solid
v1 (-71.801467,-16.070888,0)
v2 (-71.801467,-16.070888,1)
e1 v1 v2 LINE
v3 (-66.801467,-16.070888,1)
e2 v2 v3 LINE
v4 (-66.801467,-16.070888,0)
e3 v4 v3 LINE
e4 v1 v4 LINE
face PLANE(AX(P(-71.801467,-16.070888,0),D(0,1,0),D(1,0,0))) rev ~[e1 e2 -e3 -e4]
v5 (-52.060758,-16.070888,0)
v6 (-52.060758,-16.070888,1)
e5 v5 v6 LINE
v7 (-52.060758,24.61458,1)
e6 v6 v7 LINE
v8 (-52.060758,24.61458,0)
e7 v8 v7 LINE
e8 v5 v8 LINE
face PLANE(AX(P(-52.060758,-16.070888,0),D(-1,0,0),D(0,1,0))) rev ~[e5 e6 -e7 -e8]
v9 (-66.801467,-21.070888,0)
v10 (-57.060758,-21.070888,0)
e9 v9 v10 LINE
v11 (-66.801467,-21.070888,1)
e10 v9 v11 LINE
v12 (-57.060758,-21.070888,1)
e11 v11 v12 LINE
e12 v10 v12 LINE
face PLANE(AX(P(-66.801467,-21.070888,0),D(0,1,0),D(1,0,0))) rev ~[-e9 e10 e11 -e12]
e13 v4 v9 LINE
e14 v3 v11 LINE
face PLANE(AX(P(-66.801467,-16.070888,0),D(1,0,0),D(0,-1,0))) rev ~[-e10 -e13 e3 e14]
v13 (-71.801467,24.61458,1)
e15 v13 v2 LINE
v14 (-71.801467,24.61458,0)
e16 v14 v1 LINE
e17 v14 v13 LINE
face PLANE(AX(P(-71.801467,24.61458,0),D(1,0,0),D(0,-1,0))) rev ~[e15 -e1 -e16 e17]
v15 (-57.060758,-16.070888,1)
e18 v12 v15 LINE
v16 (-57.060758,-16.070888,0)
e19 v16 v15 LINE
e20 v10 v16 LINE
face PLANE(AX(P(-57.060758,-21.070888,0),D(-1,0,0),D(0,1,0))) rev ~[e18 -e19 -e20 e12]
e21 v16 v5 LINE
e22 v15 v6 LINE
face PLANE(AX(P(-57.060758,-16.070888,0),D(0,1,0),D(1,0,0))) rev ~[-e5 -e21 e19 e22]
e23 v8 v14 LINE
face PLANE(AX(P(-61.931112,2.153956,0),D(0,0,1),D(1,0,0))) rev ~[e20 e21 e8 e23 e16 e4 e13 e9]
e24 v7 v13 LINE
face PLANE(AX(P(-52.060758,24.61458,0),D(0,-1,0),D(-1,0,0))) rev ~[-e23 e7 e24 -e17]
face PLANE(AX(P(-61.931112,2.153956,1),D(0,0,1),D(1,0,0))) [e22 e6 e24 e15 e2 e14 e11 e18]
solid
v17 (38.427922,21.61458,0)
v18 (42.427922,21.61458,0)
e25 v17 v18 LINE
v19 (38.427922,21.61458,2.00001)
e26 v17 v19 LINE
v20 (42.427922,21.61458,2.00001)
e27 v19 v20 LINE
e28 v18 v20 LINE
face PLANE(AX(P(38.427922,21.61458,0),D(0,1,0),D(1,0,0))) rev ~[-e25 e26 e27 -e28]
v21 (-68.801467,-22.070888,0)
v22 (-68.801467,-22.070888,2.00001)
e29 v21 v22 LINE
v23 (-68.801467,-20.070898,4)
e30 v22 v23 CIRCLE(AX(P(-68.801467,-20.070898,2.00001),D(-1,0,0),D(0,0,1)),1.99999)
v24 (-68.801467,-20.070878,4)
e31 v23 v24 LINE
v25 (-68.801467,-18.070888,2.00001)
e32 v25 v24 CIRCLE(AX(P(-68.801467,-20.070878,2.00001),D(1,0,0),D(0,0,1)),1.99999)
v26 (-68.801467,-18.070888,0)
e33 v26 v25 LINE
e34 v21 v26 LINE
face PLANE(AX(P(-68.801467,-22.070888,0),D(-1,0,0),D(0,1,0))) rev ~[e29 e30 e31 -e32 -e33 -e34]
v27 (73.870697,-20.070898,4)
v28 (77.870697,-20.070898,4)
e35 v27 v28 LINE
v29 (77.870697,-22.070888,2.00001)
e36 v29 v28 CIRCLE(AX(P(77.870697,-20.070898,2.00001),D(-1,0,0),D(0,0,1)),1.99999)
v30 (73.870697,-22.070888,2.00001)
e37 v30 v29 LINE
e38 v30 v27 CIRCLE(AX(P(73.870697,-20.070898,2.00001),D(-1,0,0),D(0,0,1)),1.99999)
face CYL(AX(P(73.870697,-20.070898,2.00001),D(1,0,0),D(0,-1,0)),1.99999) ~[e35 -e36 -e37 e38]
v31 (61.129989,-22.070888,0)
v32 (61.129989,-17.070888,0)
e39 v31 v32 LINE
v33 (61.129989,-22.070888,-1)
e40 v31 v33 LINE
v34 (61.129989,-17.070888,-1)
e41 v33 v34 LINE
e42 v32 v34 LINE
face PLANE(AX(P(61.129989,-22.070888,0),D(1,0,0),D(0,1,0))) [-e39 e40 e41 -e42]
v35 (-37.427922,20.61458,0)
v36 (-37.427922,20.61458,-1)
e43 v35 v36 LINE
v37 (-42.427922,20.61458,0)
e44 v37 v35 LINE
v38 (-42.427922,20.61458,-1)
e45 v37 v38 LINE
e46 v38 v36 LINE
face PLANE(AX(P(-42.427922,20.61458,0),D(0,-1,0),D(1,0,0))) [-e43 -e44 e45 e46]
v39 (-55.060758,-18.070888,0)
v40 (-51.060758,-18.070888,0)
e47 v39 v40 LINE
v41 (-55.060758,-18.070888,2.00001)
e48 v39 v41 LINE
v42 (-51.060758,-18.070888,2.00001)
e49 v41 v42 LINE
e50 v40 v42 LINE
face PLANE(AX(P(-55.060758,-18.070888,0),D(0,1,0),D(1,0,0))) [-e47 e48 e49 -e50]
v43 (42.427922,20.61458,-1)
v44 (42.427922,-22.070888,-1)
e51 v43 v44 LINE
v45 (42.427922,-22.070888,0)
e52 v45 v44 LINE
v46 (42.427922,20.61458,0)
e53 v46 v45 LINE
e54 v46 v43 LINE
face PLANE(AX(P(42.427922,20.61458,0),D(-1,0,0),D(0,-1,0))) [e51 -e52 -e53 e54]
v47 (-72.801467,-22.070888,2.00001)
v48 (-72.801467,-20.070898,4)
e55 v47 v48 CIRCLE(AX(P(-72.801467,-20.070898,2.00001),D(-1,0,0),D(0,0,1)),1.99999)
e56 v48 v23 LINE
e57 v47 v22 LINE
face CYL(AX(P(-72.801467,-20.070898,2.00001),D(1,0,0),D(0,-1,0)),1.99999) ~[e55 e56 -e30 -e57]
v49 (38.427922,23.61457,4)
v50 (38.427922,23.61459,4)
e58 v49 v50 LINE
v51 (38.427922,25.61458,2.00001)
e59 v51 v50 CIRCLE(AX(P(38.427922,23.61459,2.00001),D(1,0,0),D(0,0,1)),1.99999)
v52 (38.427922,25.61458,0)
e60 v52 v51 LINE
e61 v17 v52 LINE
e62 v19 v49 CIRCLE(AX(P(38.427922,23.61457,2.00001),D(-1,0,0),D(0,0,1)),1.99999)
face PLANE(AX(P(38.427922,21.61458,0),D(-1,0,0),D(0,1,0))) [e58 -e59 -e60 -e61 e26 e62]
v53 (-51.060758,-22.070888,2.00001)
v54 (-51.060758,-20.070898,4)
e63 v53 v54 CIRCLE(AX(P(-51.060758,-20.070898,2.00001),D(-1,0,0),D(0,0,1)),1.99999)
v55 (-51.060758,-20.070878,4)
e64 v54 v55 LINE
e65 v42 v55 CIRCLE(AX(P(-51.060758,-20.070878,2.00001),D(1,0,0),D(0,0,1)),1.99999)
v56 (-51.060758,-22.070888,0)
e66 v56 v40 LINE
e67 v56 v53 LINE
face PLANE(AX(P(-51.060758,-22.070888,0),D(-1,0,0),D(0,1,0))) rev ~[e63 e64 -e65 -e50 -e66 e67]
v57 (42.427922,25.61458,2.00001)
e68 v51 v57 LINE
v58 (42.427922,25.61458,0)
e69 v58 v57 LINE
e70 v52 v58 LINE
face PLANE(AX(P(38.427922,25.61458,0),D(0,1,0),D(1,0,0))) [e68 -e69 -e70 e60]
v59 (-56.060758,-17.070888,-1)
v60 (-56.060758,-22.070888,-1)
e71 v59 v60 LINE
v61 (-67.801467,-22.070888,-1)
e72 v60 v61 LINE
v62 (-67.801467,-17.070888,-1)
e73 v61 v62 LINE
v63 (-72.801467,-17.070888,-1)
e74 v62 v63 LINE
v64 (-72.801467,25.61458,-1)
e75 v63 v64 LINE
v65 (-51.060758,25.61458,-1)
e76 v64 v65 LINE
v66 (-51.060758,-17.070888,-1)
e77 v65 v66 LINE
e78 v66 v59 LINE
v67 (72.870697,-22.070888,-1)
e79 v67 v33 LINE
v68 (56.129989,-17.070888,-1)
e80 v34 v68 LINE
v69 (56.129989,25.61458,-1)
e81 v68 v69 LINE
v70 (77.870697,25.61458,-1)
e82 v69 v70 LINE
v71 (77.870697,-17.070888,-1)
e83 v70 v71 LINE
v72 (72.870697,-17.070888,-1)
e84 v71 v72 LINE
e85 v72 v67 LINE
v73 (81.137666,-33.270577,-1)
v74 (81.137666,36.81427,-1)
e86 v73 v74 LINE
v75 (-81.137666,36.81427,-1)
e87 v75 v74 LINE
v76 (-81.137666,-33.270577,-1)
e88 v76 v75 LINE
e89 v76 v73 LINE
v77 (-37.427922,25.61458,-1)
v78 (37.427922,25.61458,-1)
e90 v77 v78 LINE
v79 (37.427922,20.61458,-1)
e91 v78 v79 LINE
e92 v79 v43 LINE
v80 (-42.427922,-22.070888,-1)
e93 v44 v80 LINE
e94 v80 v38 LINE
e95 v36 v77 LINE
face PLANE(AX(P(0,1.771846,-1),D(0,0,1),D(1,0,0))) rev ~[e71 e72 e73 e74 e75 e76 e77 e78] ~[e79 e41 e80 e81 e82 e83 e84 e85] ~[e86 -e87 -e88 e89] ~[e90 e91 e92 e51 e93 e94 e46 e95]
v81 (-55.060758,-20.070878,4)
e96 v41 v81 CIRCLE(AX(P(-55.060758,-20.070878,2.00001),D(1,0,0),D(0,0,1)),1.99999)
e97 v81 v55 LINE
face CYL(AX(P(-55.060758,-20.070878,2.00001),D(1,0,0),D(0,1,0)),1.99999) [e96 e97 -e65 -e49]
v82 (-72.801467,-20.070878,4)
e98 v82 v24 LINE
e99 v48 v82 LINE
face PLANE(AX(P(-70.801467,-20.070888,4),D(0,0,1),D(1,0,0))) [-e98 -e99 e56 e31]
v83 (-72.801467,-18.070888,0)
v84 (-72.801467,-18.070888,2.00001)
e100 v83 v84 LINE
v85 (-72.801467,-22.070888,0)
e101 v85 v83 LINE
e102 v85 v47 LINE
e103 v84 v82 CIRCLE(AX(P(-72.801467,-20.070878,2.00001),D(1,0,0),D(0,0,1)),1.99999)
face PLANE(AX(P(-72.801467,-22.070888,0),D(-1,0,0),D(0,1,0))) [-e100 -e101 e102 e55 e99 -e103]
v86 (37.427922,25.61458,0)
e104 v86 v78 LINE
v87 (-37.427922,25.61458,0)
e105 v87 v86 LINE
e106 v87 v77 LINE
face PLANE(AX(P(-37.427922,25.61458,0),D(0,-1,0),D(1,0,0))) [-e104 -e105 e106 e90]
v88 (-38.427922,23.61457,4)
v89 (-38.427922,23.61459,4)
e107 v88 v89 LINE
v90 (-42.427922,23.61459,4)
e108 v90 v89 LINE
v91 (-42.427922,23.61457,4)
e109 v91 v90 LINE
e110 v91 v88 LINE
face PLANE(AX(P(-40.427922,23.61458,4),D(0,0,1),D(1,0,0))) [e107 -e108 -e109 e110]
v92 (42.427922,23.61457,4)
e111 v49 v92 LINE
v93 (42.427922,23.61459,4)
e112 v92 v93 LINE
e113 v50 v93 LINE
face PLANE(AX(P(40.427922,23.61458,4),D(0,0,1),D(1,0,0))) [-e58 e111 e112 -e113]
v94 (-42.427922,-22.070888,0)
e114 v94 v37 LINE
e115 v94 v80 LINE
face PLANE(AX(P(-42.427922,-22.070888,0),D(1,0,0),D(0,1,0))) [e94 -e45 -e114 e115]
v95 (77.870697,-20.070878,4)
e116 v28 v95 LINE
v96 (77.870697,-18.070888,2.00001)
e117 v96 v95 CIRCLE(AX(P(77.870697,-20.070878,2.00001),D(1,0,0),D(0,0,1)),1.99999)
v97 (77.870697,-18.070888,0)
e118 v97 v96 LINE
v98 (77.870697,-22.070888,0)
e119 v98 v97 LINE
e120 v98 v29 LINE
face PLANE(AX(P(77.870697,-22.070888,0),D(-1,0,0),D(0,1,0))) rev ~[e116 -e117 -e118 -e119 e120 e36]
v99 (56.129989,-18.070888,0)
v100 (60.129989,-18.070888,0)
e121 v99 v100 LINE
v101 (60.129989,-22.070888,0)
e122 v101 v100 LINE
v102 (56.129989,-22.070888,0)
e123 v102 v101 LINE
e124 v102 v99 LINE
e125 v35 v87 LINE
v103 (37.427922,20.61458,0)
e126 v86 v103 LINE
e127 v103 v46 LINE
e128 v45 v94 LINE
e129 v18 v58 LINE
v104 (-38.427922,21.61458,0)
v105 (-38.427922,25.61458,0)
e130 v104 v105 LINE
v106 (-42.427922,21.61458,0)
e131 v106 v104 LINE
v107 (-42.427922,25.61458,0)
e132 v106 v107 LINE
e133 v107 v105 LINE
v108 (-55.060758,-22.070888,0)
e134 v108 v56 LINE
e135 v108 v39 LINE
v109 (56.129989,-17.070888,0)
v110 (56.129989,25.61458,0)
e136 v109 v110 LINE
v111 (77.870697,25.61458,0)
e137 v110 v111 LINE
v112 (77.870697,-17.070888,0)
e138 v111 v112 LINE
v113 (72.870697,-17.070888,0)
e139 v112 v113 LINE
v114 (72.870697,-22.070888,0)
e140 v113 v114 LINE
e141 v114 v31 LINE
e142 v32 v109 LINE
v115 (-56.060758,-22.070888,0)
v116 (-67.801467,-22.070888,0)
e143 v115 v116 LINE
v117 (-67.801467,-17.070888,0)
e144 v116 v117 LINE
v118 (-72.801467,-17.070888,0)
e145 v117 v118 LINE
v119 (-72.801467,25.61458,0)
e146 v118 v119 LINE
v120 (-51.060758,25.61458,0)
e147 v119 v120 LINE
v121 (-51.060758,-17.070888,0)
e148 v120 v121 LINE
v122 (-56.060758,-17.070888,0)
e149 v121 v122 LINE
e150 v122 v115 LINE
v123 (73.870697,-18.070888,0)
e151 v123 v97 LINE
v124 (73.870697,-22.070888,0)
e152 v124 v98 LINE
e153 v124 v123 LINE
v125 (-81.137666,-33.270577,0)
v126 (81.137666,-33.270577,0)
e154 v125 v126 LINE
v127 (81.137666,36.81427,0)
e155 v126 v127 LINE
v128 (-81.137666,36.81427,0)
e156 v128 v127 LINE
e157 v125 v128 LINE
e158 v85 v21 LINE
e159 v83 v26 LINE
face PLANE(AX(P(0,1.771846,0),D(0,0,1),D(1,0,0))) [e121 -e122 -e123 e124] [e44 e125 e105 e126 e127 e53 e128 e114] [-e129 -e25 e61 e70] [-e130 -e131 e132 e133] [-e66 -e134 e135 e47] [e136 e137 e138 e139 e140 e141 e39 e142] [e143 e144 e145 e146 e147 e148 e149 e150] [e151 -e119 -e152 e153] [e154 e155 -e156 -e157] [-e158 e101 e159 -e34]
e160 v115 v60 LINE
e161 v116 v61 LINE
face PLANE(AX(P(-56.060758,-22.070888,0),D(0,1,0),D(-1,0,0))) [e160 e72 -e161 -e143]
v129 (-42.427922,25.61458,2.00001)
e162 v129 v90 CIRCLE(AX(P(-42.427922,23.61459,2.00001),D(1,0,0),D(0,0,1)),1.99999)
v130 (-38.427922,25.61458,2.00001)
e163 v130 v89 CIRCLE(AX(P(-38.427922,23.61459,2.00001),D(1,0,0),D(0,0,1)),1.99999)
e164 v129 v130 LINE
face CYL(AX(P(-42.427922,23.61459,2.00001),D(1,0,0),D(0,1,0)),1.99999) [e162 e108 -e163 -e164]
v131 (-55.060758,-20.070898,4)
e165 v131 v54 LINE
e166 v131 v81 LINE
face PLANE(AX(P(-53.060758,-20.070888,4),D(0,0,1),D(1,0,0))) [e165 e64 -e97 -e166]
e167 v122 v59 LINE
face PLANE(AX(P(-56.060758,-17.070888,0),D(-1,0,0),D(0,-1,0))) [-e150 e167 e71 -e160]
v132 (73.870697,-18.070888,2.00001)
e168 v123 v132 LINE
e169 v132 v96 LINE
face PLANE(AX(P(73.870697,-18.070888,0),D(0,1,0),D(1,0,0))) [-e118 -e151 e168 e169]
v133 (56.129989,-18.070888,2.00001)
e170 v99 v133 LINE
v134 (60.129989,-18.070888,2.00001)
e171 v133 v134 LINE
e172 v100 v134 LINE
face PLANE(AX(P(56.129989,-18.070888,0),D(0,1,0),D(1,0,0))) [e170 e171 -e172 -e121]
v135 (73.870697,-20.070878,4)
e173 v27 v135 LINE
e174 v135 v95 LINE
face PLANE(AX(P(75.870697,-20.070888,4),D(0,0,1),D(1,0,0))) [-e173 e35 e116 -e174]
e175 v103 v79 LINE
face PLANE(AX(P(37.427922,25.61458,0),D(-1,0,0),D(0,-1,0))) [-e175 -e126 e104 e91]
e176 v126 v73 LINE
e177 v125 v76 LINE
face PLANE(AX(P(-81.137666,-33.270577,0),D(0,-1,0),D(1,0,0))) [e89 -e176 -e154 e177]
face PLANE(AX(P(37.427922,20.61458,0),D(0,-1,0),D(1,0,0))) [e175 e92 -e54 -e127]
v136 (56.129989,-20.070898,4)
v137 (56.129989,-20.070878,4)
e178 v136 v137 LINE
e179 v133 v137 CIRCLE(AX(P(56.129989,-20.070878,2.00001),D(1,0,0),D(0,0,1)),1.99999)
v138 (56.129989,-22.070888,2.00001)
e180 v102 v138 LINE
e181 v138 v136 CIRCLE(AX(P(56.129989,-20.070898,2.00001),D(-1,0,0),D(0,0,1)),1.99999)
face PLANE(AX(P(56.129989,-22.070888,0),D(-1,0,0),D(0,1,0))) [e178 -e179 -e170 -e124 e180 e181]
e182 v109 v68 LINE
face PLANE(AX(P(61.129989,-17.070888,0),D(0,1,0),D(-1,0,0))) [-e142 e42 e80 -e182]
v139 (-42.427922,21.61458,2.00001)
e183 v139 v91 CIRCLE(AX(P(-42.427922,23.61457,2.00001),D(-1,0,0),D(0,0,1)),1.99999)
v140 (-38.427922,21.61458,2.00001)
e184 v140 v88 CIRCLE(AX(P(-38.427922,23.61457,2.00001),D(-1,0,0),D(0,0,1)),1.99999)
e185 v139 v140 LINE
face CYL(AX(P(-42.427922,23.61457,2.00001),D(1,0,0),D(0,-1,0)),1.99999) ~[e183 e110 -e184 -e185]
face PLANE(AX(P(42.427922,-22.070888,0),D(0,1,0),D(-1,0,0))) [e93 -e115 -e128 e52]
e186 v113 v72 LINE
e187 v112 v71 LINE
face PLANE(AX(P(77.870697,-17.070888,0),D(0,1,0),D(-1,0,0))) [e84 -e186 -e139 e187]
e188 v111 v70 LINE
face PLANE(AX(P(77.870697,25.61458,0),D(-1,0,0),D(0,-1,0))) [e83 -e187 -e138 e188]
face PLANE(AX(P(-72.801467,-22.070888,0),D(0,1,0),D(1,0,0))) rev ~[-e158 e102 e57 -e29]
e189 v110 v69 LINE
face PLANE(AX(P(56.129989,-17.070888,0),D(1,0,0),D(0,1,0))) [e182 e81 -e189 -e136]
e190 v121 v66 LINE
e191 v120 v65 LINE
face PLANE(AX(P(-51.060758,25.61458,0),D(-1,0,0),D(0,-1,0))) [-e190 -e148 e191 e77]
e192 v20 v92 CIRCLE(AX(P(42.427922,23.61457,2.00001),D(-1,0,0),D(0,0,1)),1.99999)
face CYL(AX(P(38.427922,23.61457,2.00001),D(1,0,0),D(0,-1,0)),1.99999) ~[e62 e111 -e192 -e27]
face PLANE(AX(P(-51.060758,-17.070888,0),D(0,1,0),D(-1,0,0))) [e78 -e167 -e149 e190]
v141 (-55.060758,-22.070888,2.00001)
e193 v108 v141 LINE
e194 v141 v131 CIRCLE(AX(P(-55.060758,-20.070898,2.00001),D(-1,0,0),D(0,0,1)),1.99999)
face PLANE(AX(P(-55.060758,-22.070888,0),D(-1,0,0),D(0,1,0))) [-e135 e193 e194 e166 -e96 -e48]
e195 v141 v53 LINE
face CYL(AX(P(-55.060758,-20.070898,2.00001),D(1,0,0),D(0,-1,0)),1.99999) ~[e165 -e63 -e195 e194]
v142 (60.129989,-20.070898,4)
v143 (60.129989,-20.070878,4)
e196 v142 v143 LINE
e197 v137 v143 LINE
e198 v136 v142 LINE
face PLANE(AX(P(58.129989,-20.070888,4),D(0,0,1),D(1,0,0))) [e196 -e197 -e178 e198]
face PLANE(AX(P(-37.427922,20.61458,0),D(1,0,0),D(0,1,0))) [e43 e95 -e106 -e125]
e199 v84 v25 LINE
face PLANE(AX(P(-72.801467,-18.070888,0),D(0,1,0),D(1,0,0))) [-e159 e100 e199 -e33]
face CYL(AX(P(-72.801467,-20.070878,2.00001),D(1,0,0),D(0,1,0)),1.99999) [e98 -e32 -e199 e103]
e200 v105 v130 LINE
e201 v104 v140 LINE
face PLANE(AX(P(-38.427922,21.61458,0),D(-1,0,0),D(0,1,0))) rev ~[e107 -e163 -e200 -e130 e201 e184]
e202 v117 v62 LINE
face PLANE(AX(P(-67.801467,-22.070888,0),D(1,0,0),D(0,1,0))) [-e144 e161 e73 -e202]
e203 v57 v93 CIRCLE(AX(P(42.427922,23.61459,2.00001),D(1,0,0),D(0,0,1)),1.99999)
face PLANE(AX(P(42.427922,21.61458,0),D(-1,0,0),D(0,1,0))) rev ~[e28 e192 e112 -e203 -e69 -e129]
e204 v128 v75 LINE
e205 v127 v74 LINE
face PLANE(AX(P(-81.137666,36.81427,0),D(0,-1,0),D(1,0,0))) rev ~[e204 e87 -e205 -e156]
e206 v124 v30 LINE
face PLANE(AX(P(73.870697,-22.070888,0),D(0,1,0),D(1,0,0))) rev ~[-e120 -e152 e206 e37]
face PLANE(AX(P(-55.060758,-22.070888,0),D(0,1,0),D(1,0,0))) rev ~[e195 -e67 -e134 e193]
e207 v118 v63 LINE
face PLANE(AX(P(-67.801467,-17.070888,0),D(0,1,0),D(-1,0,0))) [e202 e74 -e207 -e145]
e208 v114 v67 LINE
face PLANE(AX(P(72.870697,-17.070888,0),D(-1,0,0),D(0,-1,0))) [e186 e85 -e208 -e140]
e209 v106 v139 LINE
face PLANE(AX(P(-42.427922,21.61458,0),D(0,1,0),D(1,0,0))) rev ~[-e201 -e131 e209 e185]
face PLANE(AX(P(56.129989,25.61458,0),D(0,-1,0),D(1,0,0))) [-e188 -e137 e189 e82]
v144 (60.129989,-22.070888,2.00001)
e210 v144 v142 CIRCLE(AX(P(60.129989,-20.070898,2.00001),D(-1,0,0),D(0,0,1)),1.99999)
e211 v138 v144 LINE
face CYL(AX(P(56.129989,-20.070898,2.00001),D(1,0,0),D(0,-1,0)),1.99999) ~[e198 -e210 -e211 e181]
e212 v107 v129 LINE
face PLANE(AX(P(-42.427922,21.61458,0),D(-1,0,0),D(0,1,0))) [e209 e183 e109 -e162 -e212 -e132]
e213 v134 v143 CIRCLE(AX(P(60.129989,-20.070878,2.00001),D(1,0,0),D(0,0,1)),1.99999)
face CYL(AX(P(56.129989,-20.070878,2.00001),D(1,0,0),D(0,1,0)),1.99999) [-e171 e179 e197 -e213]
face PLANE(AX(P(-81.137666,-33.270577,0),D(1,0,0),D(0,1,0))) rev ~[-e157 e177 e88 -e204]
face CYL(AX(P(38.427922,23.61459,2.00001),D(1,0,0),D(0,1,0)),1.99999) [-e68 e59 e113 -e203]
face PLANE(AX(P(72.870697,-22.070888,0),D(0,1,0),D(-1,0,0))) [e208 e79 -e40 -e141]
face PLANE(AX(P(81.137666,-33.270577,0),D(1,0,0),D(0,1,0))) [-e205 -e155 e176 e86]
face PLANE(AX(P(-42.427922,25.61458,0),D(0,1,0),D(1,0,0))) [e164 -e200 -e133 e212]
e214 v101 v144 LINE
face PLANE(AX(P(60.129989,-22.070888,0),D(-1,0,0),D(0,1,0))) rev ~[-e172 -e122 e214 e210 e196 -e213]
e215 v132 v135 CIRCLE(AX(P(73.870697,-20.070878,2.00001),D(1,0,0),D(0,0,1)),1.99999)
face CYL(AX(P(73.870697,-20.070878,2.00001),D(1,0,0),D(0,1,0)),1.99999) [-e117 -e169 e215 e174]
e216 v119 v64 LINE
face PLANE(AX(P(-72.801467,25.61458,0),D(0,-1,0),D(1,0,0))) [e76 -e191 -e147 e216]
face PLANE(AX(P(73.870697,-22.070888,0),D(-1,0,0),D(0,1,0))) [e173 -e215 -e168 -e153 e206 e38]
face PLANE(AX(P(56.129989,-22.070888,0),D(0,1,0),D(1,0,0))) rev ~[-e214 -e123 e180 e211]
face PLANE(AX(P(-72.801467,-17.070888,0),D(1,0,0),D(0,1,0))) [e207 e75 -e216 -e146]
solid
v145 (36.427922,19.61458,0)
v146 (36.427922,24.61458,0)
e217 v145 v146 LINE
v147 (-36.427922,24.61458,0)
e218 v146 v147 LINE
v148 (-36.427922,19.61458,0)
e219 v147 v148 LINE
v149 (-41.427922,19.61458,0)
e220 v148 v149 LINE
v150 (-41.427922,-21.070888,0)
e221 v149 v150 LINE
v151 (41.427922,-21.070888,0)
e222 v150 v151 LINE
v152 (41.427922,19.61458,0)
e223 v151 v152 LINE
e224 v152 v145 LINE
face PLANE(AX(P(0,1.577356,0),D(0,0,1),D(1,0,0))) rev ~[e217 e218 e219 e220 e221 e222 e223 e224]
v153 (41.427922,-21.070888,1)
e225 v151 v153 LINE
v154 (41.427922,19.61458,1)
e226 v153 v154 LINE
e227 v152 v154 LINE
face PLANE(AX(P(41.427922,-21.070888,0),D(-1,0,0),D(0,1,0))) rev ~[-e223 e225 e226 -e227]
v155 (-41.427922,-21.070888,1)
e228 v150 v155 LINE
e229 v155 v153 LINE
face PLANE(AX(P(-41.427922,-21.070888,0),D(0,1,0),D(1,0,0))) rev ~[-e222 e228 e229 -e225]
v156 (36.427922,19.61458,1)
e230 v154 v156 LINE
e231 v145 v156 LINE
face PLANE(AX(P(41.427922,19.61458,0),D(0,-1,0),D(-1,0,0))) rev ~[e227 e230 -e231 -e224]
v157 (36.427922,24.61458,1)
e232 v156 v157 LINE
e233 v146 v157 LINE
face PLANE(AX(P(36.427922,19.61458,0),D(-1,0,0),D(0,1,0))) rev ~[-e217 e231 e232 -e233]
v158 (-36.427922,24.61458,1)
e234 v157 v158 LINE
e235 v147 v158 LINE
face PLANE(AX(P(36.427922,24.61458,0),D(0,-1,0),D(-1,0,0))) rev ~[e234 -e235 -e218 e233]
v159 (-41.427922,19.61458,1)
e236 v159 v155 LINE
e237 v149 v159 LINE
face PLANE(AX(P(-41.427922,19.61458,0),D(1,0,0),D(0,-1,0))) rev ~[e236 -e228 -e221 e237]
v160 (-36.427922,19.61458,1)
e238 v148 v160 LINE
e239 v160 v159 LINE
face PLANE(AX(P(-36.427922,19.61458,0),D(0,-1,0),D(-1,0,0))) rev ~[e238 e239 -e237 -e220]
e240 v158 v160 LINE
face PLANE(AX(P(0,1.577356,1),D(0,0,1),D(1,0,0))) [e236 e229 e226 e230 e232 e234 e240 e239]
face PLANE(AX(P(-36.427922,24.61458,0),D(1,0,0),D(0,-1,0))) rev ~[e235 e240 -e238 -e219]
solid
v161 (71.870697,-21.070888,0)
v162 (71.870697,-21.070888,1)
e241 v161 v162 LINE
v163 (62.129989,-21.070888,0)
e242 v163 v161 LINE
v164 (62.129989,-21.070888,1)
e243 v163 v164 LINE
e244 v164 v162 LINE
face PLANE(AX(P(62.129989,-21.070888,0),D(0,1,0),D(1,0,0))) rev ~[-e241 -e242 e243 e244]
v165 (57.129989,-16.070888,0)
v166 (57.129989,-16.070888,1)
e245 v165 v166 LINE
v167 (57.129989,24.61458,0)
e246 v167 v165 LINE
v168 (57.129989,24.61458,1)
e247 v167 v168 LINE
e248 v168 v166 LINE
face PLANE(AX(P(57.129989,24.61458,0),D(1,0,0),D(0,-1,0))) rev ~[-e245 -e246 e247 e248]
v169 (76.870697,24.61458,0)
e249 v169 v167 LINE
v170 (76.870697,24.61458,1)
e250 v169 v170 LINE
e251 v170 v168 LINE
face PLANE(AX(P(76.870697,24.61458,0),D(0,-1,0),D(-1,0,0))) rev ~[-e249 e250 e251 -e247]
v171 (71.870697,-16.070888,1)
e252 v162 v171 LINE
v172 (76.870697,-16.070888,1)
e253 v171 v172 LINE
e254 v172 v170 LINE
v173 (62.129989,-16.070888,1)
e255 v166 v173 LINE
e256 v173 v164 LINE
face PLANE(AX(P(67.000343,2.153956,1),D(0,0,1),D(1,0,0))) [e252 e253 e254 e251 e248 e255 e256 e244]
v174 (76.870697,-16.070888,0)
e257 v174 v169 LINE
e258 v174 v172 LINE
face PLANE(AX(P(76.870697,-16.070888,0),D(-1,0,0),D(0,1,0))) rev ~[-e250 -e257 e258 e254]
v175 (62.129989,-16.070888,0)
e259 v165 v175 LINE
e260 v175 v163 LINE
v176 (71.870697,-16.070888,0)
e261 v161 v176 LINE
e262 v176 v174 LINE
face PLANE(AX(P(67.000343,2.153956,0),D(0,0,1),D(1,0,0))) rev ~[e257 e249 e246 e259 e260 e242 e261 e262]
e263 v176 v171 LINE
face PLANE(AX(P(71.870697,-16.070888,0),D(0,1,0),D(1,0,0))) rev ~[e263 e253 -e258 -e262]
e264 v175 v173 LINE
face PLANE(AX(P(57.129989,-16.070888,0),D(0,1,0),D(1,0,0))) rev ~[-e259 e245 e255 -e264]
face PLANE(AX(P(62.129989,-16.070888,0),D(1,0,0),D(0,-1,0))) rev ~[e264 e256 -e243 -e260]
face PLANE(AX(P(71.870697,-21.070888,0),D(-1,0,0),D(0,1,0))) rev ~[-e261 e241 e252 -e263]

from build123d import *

# Parameters (mm, degrees)
F0_W     = 162.2753325211
F0_H     = 70.084847109
F0_W_2   = 4
F0_H_2   = 4
F1_DEPTH = 1
F2_DEPTH = 4
F3_R     = 1.99999
F4_DEPTH = 1


# Not quite as in the source:
# - a fillet or chamfer is up to 0.001 mm smaller than in the source, because OpenCascade refuses the exact size


with BuildPart() as f1:
    # F0 (on Top) → F1 (new body)
    with BuildSketch(Plane.XY):
        with Locations((0, 1.7718460756)):
            Rectangle(F0_W, F0_H)
        with Locations((-70.8014665545, -20.0708878118)):
            Rectangle(F0_W_2, F0_H_2, mode=Mode.SUBTRACT)
        with Locations((-53.0607582087, -20.0708878118)):
            Rectangle(F0_W_2, F0_H_2, mode=Mode.SUBTRACT)
        Polygon((-72.8014665545, -17.0708878118), (-72.8014665545, 25.6145799629), (-51.0607582087, 25.6145799629), (-51.0607582087, -17.0708878118), (-56.0607582087, -17.0708878118), (-56.0607582087, -22.0708878118), (-67.8014665545, -22.0708878118), (-67.8014665545, -17.0708878118), align=None, mode=Mode.SUBTRACT)
        with Locations((58.1299888442, -20.0708878118)):
            Rectangle(F0_W_2, F0_H_2, mode=Mode.SUBTRACT)
        with Locations((75.87069719, -20.0708878118)):
            Rectangle(F0_W_2, F0_H_2, mode=Mode.SUBTRACT)
        with Locations((-40.4279221569, 23.6145799629)):
            Rectangle(F0_W_2, F0_H_2, mode=Mode.SUBTRACT)
        Polygon((-37.4279221569, 20.6145799629), (-37.4279221569, 25.6145799629), (37.4279221569, 25.6145799629), (37.4279221569, 20.6145799629), (42.4279221569, 20.6145799629), (42.4279221569, -22.0708878118), (-42.4279221569, -22.0708878118), (-42.4279221569, 20.6145799629), align=None, mode=Mode.SUBTRACT)
        with Locations((40.4279221569, 23.6145799629)):
            Rectangle(F0_W_2, F0_H_2, mode=Mode.SUBTRACT)
        Polygon((72.87069719, -17.0708878118), (72.87069719, -22.0708878118), (61.1299888442, -22.0708878118), (61.1299888442, -17.0708878118), (56.1299888442, -17.0708878118), (56.1299888442, 25.6145799629), (77.87069719, 25.6145799629), (77.87069719, -17.0708878118), align=None, mode=Mode.SUBTRACT)
        with Locations((-53.0607582087, -20.0708878118)):
            Rectangle(F0_W_2, F0_H_2)
        with Locations((-70.8014665545, -20.0708878118)):
            Rectangle(F0_W_2, F0_H_2)
        with Locations((40.4279221569, 23.6145799629)):
            Rectangle(F0_W_2, F0_H_2)
        with Locations((-40.4279221569, 23.6145799629)):
            Rectangle(F0_W_2, F0_H_2)
        with Locations((75.87069719, -20.0708878118)):
            Rectangle(F0_W_2, F0_H_2)
        with Locations((58.1299888442, -20.0708878118)):
            Rectangle(F0_W_2, F0_H_2)
    extrude(amount=-F1_DEPTH)

    # F0 (on Top) → F2 (join)
    with BuildSketch(Plane.XY):
        with Locations((-70.8014665545, -20.0708878118)):
            Rectangle(F0_W_2, F0_H_2)
        with Locations((-53.0607582087, -20.0708878118)):
            Rectangle(F0_W_2, F0_H_2)
        with Locations((-40.4279221569, 23.6145799629)):
            Rectangle(F0_W_2, F0_H_2)
        with Locations((40.4279221569, 23.6145799629)):
            Rectangle(F0_W_2, F0_H_2)
        with Locations((75.87069719, -20.0708878118)):
            Rectangle(F0_W_2, F0_H_2)
        with Locations((58.1299888442, -20.0708878118)):
            Rectangle(F0_W_2, F0_H_2)
    extrude(amount=F2_DEPTH)

    # F3 (radius 2 in the source; OpenCascade refuses exactly that, so slightly less here)
    f3_edges = [f1.edges().sort_by_distance(p)[0] for p in [
        (-70.801467, -18.070888, 4),
        (-70.801467, -22.070888, 4),
        (-53.060758, -18.070888, 4),
        (-53.060758, -22.070888, 4),
        (-40.427922, 25.61458, 4),
        (-40.427922, 21.61458, 4),
        (40.427922, 25.61458, 4),
        (40.427922, 21.61458, 4),
        (58.129989, -18.070888, 4),
        (58.129989, -22.070888, 4),
        (75.870697, -22.070888, 4),
        (75.870697, -18.070888, 4),
    ]]
    fillet(f3_edges, radius=F3_R)


with BuildPart() as f4:
    # F0 (on Top) → F4 (new body)
    with BuildSketch(Plane.XY):
        Polygon((-52.0607582087, -16.0708878118), (-52.0607582087, 24.6145799629), (-71.8014665545, 24.6145799629), (-71.8014665545, -16.0708878118), (-66.8014665545, -16.0708878118), (-66.8014665545, -21.0708878118), (-57.0607582087, -21.0708878118), (-57.0607582087, -16.0708878118), align=None)
    extrude(amount=F4_DEPTH)


with BuildPart() as f4b:
    # F0 (on Top) → F4, piece 2 (new body)
    with BuildSketch(Plane.XY):
        Polygon((-36.4279221569, 19.6145799629), (-41.4279221569, 19.6145799629), (-41.4279221569, -21.0708878118), (41.4279221569, -21.0708878118), (41.4279221569, 19.6145799629), (36.4279221569, 19.6145799629), (36.4279221569, 24.6145799629), (-36.4279221569, 24.6145799629), align=None)
    extrude(amount=F4_DEPTH)


with BuildPart() as f4c:
    # F0 (on Top) → F4, piece 3 (new body)
    with BuildSketch(Plane.XY):
        Polygon((76.87069719, -16.0708878118), (76.87069719, 24.6145799629), (57.1299888442, 24.6145799629), (57.1299888442, -16.0708878118), (62.1299888442, -16.0708878118), (62.1299888442, -21.0708878118), (71.87069719, -21.0708878118), (71.87069719, -16.0708878118), align=None)
    extrude(amount=F4_DEPTH)


solid = Compound([f1.part, f4.part, f4b.part, f4c.part])
